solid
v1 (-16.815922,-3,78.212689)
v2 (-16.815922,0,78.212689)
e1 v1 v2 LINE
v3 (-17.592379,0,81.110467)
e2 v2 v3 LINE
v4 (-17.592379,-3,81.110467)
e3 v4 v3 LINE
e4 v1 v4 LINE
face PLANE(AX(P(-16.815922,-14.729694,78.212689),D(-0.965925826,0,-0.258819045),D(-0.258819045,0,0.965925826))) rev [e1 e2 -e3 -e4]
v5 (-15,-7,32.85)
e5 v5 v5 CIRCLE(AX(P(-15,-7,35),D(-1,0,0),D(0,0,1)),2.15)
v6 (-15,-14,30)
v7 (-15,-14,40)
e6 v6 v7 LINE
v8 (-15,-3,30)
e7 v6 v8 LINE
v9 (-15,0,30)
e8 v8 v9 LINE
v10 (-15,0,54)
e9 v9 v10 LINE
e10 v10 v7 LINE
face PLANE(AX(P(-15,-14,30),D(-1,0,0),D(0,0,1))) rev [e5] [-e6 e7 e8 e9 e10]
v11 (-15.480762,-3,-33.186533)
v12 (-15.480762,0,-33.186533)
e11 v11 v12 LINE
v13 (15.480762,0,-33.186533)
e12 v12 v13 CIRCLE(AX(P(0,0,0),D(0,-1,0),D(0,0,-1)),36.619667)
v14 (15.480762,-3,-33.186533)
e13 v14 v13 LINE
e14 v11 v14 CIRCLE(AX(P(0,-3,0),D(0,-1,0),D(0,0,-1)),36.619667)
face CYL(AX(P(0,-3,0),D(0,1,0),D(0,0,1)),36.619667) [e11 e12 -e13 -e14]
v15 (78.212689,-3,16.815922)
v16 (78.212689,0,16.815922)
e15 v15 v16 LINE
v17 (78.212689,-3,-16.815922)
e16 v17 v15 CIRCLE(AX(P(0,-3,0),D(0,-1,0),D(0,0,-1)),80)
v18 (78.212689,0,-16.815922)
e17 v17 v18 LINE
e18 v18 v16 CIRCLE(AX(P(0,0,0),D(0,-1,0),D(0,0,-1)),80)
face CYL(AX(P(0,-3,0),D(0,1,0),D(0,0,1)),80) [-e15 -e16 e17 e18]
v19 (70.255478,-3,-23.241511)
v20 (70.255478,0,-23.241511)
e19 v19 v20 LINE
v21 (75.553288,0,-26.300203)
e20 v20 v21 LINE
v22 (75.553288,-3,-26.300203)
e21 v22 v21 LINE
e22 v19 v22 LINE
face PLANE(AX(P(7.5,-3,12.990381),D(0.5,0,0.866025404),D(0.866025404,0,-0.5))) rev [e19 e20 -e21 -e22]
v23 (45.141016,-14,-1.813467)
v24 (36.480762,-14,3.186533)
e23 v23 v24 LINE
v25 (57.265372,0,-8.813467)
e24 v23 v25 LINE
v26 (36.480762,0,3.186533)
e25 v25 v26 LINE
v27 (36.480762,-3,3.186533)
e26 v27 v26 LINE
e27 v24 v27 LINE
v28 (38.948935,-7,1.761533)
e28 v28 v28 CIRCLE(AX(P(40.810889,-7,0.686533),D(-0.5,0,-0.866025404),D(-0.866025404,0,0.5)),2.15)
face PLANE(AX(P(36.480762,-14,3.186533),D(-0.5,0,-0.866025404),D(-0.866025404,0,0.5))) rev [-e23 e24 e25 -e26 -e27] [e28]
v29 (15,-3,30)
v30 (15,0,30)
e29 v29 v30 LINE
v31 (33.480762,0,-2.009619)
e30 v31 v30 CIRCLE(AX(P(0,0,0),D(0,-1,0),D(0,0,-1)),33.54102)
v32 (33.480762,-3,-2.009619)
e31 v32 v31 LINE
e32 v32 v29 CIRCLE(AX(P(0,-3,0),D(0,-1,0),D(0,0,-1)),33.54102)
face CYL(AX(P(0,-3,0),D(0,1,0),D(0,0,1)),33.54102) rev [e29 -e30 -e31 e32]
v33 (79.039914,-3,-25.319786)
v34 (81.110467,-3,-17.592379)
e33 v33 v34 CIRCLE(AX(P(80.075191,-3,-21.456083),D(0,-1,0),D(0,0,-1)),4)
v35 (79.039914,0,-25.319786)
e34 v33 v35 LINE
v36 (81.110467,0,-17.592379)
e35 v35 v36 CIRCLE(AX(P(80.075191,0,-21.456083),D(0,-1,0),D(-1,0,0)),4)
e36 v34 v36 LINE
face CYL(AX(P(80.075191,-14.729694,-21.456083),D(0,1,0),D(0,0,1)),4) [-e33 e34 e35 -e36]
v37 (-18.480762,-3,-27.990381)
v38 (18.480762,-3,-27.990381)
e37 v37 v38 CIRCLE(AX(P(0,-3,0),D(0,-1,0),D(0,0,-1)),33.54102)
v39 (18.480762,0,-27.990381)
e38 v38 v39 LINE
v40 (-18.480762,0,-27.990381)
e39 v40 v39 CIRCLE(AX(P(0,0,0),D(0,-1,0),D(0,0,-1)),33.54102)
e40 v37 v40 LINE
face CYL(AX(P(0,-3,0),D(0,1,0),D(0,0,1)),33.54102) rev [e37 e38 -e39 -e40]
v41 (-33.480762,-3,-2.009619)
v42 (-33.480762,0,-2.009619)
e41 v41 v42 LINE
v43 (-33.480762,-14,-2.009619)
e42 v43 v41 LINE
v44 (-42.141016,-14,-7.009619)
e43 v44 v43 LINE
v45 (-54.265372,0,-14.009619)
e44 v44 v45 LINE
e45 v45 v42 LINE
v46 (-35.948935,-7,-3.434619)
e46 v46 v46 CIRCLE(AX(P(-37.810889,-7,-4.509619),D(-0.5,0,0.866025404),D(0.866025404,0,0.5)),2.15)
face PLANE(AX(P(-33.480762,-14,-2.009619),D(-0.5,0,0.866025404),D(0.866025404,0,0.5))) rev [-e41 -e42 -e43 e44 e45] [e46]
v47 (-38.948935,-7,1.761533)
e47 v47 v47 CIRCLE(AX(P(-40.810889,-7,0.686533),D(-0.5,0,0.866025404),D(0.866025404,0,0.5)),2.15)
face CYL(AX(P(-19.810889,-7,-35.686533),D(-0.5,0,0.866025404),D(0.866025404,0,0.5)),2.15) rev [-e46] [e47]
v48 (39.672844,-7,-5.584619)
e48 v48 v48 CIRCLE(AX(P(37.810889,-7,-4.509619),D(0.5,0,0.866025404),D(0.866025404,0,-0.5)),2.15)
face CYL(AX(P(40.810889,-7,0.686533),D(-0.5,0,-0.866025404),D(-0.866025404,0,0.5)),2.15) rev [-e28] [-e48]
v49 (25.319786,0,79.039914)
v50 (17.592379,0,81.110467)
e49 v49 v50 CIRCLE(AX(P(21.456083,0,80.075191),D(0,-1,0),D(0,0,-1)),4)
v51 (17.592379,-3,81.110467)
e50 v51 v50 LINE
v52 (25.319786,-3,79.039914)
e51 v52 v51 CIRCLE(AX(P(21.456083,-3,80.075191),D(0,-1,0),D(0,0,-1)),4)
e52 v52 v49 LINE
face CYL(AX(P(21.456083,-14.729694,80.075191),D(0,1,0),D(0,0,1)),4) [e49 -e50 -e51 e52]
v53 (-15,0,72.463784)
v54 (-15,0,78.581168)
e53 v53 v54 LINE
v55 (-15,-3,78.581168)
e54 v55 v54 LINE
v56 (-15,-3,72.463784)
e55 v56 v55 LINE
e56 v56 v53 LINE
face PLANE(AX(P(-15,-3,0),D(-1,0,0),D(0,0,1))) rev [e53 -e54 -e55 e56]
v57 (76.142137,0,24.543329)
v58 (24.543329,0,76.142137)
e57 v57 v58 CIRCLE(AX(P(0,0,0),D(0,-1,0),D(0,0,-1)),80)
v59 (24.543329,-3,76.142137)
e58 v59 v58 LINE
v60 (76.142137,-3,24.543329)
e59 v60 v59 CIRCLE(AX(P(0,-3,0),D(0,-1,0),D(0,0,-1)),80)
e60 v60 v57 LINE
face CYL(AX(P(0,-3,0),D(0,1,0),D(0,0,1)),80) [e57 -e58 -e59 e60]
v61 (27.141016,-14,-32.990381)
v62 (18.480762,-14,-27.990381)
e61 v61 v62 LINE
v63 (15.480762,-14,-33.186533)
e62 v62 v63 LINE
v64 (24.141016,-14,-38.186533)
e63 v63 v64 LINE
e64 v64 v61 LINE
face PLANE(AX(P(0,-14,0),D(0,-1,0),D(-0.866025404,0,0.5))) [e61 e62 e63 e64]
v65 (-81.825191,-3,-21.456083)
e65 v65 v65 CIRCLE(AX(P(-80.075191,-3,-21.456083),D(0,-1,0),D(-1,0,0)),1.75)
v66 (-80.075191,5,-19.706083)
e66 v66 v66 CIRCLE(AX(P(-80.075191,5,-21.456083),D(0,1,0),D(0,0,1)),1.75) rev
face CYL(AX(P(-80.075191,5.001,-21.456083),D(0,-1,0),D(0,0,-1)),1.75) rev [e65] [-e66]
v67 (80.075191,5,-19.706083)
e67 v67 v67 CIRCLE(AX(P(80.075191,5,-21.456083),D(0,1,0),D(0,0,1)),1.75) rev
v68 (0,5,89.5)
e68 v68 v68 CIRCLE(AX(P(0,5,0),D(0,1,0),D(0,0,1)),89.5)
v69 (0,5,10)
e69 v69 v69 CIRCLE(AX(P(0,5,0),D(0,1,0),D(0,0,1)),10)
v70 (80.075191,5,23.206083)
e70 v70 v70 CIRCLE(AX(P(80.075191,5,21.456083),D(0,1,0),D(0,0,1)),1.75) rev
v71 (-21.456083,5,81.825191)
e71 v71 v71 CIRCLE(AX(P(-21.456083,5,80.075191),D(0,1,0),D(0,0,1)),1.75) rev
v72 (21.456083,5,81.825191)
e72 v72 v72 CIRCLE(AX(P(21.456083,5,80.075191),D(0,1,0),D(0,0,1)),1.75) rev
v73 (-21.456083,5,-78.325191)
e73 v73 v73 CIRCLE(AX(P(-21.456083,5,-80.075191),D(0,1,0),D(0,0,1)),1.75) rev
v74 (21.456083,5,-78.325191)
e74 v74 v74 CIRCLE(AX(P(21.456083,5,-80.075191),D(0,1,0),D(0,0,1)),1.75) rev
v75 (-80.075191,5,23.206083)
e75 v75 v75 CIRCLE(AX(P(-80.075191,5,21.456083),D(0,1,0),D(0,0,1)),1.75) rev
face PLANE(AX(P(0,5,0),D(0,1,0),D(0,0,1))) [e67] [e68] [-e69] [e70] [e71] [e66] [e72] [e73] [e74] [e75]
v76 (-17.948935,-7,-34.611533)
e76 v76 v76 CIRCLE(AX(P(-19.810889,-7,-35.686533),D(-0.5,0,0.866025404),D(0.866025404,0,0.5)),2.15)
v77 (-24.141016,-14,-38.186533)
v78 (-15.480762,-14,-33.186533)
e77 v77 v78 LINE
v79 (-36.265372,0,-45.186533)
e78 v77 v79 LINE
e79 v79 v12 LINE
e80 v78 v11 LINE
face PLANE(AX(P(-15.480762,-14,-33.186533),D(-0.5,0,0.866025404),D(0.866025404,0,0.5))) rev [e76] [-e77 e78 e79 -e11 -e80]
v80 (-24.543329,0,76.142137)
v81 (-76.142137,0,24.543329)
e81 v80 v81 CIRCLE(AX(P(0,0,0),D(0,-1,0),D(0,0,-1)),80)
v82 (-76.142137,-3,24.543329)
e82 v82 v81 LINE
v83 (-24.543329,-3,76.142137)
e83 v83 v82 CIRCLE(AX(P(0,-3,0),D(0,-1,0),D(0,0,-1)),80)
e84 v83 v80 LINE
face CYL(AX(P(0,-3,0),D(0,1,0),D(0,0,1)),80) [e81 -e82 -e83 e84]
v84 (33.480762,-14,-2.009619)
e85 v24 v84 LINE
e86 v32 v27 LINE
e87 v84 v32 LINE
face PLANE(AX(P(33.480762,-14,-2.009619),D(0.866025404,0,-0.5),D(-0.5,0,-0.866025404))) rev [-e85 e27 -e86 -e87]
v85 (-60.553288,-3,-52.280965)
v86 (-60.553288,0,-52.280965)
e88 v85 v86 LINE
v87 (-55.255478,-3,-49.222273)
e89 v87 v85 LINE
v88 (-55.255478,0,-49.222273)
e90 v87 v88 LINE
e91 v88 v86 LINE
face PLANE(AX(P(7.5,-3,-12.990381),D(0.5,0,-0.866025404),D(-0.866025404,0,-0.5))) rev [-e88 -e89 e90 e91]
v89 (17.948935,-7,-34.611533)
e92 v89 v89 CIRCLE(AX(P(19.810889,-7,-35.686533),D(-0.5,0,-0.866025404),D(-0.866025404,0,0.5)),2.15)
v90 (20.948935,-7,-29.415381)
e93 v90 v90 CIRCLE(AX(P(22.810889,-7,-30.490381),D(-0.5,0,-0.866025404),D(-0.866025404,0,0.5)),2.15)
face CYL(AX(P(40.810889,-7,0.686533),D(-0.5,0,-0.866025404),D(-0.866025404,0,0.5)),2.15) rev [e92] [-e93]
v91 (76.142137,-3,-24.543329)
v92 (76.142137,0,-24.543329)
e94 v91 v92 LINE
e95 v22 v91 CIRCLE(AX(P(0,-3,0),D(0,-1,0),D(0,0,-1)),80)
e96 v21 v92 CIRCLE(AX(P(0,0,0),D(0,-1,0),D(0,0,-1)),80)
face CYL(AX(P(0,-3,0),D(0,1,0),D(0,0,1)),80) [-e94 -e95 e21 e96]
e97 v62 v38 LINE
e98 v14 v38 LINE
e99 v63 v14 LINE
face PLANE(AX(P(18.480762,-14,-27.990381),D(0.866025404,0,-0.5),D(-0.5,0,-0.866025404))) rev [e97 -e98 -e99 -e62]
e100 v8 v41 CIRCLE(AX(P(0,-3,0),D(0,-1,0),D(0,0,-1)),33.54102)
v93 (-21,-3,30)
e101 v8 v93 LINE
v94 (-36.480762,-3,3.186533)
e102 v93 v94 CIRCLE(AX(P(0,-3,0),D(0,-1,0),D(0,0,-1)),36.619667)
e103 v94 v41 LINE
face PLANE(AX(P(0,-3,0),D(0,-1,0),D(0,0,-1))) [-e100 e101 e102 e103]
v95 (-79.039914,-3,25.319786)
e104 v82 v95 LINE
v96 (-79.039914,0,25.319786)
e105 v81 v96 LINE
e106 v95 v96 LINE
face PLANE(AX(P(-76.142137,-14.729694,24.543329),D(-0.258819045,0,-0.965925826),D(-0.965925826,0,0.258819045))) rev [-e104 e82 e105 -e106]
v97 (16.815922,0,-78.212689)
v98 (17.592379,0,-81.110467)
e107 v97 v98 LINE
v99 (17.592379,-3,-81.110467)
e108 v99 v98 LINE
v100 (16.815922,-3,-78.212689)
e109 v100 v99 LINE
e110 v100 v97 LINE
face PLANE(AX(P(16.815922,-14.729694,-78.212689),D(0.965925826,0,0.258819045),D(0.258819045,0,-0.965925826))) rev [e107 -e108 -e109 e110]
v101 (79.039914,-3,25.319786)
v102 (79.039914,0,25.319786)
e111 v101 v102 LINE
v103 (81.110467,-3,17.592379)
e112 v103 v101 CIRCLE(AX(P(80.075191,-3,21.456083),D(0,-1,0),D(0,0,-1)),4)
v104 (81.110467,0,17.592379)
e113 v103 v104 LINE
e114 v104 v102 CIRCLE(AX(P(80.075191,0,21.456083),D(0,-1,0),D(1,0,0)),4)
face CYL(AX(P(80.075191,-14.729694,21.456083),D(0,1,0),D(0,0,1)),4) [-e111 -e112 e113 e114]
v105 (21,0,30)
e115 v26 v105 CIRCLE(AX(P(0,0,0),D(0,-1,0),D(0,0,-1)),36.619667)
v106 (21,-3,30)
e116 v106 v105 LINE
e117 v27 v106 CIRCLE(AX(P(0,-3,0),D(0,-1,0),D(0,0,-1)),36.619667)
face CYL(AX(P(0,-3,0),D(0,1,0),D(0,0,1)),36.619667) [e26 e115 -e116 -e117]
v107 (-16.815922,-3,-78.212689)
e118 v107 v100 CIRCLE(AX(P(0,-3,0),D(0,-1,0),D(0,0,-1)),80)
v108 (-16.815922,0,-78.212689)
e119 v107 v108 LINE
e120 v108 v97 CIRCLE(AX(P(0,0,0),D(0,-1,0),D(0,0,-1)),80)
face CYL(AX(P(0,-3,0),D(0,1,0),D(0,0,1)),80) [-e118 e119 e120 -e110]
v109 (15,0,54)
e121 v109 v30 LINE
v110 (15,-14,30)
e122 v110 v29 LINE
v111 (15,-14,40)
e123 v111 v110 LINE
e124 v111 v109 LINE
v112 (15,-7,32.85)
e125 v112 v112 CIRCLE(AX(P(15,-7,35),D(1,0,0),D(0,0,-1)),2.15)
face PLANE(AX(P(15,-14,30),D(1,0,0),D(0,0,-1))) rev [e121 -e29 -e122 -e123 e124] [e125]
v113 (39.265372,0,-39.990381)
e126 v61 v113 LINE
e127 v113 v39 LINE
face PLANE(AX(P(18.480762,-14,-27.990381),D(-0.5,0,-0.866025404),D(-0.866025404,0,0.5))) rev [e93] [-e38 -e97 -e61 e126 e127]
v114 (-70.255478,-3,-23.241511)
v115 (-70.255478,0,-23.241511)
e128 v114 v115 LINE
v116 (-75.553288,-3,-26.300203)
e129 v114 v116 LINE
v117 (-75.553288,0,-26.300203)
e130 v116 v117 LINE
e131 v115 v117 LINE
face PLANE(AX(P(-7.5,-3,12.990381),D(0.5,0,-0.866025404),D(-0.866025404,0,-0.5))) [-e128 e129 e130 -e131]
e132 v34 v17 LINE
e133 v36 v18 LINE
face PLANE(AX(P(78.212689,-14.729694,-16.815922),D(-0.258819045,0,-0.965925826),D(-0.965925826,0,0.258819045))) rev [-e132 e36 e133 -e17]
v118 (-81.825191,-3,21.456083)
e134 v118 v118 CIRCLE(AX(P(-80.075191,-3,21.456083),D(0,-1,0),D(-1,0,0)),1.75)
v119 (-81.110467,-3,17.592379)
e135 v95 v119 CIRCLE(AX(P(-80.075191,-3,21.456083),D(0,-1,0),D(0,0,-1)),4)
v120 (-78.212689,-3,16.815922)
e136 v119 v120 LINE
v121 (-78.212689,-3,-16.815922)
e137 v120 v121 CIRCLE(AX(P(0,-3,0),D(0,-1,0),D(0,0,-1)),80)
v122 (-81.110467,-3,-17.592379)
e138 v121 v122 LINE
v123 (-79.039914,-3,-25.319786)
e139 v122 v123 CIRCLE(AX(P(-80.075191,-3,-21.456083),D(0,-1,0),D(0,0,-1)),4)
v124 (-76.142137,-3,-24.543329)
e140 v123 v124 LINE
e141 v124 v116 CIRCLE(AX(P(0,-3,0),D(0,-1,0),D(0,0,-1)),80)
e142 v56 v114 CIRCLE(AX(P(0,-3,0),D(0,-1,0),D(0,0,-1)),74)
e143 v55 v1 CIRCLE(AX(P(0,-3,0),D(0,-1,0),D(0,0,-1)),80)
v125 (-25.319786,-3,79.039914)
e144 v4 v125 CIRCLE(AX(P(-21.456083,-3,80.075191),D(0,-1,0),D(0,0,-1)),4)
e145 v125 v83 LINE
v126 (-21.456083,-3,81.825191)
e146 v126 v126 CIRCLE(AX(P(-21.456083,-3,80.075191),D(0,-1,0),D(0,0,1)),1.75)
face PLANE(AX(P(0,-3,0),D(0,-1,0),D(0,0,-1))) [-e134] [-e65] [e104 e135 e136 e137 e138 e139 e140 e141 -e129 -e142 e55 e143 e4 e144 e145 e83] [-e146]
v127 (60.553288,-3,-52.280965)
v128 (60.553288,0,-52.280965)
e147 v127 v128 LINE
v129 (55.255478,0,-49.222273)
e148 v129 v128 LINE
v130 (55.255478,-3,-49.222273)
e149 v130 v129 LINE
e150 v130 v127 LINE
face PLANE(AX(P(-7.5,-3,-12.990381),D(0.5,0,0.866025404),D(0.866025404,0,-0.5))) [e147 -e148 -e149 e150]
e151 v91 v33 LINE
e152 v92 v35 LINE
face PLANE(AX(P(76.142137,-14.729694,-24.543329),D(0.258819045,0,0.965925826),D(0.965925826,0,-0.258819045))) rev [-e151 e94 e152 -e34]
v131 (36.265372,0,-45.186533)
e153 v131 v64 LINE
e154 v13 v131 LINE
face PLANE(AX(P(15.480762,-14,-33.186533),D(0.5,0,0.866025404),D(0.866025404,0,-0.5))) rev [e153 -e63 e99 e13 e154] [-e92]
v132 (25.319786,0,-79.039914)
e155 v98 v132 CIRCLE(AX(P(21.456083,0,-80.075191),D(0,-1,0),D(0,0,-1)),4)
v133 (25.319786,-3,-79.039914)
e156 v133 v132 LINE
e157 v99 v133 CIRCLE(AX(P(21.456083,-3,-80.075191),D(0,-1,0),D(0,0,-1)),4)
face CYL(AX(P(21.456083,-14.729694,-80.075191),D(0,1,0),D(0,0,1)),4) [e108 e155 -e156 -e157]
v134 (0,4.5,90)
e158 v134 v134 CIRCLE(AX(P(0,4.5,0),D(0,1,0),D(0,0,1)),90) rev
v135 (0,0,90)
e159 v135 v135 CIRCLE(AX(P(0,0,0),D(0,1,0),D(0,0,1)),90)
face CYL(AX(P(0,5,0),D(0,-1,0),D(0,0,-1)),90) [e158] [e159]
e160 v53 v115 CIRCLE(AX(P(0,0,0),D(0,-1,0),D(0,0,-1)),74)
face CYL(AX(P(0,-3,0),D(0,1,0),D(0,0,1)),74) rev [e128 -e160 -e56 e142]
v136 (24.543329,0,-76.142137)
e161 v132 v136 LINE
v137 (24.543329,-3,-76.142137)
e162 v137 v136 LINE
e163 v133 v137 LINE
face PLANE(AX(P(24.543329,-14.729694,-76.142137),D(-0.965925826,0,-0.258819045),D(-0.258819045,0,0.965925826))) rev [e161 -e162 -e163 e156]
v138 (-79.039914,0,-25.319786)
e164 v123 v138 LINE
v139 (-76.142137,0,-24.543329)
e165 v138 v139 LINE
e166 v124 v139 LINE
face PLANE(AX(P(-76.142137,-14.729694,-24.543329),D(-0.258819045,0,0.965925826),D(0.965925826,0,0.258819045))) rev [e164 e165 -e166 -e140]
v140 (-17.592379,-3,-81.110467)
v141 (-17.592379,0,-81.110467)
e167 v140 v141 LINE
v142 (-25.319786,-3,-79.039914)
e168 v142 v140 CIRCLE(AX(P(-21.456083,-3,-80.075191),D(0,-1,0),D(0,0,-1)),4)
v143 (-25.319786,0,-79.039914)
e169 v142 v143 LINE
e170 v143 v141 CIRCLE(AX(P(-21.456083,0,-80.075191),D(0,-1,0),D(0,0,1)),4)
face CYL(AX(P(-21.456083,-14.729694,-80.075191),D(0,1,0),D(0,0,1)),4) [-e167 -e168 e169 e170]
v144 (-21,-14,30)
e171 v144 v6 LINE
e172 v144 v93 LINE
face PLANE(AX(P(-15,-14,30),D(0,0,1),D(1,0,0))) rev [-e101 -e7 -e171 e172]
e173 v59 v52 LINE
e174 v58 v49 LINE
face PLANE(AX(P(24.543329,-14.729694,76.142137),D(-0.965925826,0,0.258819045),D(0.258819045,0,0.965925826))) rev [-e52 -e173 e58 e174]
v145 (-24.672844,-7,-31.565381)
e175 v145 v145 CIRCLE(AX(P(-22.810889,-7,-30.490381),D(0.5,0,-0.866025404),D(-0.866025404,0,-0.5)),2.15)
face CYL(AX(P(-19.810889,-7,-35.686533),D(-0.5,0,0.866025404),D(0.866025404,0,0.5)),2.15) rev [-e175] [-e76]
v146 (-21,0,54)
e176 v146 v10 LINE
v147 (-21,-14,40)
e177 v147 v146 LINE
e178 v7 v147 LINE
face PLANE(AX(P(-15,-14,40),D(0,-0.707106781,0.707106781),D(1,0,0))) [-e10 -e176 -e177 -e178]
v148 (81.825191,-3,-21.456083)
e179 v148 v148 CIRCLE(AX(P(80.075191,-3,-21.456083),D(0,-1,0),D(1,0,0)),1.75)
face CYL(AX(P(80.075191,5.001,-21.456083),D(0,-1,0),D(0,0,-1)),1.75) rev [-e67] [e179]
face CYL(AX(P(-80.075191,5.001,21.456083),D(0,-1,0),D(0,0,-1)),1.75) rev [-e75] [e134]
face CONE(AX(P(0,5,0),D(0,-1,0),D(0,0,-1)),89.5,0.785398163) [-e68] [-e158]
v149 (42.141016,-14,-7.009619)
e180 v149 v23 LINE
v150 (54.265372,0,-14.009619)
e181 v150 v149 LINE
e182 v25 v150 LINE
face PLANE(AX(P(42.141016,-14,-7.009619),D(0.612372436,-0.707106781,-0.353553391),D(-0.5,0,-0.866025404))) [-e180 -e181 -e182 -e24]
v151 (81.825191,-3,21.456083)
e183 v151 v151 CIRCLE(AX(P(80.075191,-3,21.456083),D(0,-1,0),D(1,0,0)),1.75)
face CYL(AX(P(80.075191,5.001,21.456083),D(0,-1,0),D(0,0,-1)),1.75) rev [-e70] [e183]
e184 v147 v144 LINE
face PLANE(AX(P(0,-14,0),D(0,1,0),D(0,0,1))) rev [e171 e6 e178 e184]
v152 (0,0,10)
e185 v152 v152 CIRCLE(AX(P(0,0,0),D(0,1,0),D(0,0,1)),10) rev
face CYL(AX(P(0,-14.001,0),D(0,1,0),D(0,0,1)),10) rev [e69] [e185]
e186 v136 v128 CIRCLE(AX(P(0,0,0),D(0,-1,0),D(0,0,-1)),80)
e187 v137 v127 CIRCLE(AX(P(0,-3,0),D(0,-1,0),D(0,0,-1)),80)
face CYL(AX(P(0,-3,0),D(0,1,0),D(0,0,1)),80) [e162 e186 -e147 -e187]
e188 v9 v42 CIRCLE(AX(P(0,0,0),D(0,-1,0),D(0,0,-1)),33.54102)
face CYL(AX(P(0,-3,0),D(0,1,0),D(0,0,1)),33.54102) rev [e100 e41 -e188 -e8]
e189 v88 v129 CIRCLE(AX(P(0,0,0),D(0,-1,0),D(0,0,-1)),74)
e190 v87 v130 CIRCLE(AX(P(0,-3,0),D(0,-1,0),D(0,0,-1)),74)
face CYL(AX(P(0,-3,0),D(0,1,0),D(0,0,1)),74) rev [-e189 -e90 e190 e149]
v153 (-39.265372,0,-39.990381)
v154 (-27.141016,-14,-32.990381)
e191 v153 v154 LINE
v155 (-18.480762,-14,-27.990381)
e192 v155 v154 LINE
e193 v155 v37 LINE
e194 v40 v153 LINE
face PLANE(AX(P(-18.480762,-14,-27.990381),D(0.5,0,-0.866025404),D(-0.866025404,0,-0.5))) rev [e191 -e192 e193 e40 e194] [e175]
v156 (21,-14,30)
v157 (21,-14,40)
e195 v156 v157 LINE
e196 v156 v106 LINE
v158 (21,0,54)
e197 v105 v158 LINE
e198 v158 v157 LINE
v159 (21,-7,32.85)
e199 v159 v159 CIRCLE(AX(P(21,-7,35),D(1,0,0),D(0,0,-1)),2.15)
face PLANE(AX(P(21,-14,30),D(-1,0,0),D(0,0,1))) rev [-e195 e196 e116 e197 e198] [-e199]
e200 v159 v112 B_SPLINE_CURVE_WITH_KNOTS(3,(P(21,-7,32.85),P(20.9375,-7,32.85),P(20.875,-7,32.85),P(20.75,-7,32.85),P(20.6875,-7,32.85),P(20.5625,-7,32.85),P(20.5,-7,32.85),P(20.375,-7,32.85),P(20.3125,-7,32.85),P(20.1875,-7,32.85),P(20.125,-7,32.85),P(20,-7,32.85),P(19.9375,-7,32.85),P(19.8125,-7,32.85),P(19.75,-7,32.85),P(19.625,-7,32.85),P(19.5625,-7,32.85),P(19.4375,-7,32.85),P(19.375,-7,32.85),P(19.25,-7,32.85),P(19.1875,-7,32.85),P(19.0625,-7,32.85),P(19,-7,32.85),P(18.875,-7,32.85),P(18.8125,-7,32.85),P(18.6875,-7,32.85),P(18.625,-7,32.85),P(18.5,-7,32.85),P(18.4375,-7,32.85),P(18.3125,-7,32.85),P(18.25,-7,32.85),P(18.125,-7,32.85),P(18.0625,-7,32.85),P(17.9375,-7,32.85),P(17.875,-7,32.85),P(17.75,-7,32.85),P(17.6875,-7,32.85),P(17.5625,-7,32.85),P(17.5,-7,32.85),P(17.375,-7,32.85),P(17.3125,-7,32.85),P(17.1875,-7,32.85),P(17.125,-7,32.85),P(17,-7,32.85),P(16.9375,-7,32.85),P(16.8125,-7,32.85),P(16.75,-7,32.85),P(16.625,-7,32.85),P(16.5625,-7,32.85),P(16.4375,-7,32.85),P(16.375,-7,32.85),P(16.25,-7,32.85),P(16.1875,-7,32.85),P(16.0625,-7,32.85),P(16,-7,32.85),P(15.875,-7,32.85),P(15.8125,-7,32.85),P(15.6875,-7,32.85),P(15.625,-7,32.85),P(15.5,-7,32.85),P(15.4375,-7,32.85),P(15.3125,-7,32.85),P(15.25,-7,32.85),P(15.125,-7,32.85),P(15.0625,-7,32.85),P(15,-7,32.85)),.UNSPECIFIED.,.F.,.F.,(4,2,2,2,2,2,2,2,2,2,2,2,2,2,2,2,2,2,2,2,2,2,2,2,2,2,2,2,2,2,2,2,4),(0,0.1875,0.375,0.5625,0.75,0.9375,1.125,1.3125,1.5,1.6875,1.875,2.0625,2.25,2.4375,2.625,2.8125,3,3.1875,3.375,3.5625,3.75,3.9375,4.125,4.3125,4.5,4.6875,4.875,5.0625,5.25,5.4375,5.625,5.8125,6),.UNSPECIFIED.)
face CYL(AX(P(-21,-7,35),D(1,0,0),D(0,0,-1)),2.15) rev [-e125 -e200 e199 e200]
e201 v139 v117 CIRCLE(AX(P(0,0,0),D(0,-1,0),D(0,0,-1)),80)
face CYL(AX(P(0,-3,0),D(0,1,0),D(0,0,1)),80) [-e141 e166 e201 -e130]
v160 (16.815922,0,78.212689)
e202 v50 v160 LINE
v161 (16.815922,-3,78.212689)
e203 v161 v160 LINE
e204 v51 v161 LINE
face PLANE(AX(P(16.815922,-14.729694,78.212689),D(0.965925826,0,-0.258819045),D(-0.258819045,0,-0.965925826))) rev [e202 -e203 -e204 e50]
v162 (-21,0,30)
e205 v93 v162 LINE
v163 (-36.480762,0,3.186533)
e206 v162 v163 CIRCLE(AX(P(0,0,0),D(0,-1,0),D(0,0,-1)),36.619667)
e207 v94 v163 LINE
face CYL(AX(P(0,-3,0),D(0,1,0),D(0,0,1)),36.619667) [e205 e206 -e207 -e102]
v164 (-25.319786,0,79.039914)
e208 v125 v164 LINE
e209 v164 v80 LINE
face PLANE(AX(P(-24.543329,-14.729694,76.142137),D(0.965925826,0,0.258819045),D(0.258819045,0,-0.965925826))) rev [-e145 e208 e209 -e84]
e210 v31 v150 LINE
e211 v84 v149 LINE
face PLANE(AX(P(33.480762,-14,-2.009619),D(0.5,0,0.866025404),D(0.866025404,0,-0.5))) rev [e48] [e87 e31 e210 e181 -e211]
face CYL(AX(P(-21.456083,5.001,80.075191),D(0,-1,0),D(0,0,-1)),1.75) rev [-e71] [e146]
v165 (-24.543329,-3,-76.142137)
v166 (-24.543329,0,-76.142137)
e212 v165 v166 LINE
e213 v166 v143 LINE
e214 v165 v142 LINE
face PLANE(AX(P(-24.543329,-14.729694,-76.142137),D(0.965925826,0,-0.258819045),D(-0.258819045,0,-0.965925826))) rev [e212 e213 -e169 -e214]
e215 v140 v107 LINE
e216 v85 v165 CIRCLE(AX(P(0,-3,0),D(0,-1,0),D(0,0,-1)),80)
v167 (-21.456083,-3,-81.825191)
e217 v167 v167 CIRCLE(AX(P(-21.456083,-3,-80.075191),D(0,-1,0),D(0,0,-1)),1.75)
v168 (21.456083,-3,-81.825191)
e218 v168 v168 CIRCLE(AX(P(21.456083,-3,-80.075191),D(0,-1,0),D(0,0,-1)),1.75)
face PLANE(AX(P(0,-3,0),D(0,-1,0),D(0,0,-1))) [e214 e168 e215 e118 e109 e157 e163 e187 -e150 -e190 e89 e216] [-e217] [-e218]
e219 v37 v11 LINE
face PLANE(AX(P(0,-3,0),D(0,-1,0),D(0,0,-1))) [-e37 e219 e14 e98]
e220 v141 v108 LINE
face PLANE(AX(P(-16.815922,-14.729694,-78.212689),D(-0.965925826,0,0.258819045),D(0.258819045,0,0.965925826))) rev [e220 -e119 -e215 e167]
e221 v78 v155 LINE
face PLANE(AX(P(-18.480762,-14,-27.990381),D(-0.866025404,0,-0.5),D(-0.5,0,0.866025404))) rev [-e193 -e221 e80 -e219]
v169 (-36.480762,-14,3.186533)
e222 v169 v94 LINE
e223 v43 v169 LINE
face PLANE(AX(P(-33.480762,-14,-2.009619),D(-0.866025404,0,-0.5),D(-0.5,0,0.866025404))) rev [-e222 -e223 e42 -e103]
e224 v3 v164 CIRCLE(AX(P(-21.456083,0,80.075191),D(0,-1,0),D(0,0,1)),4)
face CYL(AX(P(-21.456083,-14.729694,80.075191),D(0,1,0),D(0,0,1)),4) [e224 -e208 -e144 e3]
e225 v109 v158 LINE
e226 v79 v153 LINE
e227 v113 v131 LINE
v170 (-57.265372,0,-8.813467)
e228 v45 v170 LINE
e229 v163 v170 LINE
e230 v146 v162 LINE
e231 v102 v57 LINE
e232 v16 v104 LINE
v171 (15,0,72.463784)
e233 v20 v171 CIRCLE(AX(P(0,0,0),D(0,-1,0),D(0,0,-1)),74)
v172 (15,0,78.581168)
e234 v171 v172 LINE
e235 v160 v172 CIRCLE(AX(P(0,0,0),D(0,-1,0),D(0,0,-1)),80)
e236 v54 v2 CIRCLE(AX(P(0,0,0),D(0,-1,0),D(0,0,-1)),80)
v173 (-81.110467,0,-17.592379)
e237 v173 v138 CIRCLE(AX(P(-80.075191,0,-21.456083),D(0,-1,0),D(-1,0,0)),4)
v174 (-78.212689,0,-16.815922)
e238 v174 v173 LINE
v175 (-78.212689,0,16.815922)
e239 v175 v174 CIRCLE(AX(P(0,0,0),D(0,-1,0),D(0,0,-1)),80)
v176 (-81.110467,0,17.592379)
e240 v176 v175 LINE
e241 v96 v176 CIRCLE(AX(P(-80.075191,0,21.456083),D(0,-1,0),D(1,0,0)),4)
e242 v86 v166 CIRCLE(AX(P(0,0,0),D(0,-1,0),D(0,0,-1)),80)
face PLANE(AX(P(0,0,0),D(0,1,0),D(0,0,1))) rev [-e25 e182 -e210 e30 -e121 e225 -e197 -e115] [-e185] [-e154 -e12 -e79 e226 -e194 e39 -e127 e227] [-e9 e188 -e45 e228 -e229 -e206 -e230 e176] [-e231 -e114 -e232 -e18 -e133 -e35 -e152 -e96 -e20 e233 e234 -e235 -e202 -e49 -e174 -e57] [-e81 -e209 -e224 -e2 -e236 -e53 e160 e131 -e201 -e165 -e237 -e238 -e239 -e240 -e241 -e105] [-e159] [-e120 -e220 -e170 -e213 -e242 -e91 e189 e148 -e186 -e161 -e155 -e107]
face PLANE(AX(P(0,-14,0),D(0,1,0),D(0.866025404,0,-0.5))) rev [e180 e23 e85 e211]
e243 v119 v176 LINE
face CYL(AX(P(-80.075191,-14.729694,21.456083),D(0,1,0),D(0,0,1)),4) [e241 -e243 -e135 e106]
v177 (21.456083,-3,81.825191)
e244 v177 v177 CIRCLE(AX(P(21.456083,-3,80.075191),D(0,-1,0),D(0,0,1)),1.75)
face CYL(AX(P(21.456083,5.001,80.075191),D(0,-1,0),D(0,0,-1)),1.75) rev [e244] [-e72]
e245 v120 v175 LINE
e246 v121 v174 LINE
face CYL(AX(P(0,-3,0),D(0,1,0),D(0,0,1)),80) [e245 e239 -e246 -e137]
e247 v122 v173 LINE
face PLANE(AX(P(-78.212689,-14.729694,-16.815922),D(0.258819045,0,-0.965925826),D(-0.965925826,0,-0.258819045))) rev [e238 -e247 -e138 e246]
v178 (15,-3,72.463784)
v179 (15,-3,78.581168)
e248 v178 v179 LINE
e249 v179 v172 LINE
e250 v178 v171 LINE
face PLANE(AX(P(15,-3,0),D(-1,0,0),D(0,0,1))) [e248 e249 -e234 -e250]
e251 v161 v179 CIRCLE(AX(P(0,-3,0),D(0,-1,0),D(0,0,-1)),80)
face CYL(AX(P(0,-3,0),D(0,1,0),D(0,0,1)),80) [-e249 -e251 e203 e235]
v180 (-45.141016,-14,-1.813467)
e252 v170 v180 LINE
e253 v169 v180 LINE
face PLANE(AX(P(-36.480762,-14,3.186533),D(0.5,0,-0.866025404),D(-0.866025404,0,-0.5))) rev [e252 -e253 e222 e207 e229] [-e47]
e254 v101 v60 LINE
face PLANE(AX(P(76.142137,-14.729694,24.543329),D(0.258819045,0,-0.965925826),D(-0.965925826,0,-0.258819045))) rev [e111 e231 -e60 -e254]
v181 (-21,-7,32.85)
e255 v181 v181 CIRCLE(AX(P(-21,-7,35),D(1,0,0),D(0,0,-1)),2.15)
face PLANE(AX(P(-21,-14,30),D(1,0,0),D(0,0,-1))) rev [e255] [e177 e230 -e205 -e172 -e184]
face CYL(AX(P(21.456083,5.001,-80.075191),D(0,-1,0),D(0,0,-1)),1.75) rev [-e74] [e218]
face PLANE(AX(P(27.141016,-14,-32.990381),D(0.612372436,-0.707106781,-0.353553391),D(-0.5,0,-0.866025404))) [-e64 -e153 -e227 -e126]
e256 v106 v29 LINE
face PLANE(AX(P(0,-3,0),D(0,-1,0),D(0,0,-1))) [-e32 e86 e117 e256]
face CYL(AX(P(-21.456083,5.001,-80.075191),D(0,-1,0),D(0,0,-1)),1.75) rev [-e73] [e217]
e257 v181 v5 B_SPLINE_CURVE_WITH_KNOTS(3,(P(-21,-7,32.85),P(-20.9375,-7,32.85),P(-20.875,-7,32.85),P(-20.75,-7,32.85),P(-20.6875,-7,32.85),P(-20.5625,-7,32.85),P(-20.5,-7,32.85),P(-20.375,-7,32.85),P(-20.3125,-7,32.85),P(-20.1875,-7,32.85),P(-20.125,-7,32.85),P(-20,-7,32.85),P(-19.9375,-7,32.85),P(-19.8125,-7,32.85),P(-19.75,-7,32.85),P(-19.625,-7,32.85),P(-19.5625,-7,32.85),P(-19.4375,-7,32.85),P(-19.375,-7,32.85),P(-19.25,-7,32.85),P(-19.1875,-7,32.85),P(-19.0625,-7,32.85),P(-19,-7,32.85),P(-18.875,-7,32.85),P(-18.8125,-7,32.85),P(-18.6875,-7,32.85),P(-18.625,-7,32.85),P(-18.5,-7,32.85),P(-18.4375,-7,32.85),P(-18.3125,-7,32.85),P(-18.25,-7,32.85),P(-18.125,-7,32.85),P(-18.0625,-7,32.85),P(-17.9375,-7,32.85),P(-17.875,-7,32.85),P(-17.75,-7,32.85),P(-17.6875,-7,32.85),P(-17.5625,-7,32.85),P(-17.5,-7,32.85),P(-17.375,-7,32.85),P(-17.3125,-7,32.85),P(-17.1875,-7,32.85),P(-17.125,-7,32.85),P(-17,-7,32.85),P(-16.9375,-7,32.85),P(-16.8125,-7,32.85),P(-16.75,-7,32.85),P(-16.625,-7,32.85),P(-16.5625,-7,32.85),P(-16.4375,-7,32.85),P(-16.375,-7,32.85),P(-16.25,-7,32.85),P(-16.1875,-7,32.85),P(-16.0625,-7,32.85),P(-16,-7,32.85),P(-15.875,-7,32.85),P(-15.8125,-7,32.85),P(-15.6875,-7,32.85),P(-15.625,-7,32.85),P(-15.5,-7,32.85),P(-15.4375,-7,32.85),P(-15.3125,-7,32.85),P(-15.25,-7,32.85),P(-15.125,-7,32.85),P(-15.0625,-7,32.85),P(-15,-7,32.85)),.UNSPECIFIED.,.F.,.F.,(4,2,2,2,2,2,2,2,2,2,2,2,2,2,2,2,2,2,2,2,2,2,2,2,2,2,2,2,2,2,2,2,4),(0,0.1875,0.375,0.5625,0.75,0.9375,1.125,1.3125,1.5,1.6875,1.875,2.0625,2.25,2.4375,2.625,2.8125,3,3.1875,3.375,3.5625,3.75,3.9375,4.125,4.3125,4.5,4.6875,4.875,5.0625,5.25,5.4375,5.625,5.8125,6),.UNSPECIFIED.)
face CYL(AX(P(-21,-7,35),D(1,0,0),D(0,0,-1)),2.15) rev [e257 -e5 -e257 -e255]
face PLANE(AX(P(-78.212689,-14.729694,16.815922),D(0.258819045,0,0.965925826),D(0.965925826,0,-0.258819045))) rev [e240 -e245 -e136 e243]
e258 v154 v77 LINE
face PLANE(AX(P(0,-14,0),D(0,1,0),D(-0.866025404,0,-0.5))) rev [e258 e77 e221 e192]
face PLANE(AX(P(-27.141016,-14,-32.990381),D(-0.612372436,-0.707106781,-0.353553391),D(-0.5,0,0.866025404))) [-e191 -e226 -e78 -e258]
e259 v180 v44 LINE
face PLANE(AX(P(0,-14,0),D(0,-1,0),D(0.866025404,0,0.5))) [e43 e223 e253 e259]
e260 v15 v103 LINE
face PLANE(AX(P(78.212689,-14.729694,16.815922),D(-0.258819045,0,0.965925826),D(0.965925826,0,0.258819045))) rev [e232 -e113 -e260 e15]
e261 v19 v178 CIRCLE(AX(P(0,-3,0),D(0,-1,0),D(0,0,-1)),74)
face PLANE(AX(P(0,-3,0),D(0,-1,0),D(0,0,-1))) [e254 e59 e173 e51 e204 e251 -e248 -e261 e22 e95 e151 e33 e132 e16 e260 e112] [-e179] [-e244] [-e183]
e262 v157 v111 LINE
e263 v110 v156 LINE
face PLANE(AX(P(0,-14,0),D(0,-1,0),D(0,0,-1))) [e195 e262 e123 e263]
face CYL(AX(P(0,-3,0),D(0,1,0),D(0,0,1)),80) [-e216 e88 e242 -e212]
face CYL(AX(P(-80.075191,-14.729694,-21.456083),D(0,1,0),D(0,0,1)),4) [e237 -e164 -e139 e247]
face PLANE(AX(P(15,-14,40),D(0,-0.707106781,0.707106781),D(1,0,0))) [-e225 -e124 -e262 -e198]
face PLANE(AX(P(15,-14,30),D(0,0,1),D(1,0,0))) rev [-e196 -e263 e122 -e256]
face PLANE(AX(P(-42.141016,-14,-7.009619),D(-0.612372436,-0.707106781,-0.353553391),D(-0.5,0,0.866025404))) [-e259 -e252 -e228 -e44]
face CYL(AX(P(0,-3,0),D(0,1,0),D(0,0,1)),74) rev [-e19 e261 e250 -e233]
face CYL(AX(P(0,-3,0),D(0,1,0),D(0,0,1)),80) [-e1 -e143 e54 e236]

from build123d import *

# Parameters (mm, degrees)
SKIZZE1_R                       = 90
AUFSATZ_LINEAR_AUSTRAGEN1_DEPTH = 5
SKIZZE2_W                       = 6
SKIZZE2_H                       = 10
AUFSATZ_LINEAR_AUSTRAGEN2_DEPTH = 14
FASE1_SIZE                      = 14
SKIZZE3_R                       = 2.15
SCHNITT_LINEAR_AUSTRAGEN1_DEPTH = 42
KREISMUSTER1_COUNT              = 3
FASE1_OF_KREISMUSTER1_SIZE      = 14
AUFSATZ_LINEAR_AUSTRAGEN3_DEPTH = 3
AUFSATZ_LINEAR_AUSTRAGEN4_DEPTH = 3
SCHNITT_LINEAR_AUSTRAGEN2_REACH = 129.754
SKIZZE7_R                       = 1.75
KREISMUSTER2_COUNT              = 4
SCHNITT_LINEAR_AUSTRAGEN3_REACH = 130.69
SKIZZE8_R                       = 10
FASE2_SIZE                      = 0.5


with BuildPart() as part:
    # Skizze1 → Aufsatz-Linear austragen1 (new body)
    with BuildSketch(Plane(origin=(0, 0, 0), x_dir=(1, 0, 0), z_dir=(0, 1, 0))):
        with Locations(Location((0, 0, 0), (0, 0, 270))):
            Circle(SKIZZE1_R)
    extrude(amount=AUFSATZ_LINEAR_AUSTRAGEN1_DEPTH)

    # Skizze2 → Aufsatz-Linear austragen2 (add)
    with BuildSketch(Plane.XZ):
        with Locations((-18, 35)):
            Rectangle(SKIZZE2_W, SKIZZE2_H)
        with Locations((18, 35)):
            Rectangle(SKIZZE2_W, SKIZZE2_H)
    aufsatz_linear_austragen2 = extrude(amount=AUFSATZ_LINEAR_AUSTRAGEN2_DEPTH)

    # Fase1
    fase1_edges = [part.edges().sort_by_distance(p)[0] for p in [
        (18, 0, 40),
        (-18, 0, 40),
    ]]
    chamfer(fase1_edges, length=FASE1_SIZE - 0.0001)  # a hair under: the kernel refuses the full size

    # Skizze3 → Schnitt-Linear austragen1 (cut)
    with BuildSketch(Plane(origin=(21, 0, 0), x_dir=(0, 0, -1), z_dir=(1, 0, 0))):
        with Locations((-35, -7)):
            Circle(SKIZZE3_R)
    schnitt_linear_austragen1 = extrude(amount=-SCHNITT_LINEAR_AUSTRAGEN1_DEPTH, mode=Mode.SUBTRACT)

    # Kreismuster1: Aufsatz-Linear austragen2, Schnitt-Linear austragen1 ×3 about axis
    kreismuster1_axis = Axis((0, 0, 0), (0, 1, 0))
    add([aufsatz_linear_austragen2.rotate(kreismuster1_axis, i * 360 / KREISMUSTER1_COUNT) for i in range(1, KREISMUSTER1_COUNT)])
    add([schnitt_linear_austragen1.rotate(kreismuster1_axis, i * 360 / KREISMUSTER1_COUNT) for i in range(1, KREISMUSTER1_COUNT)], mode=Mode.SUBTRACT)

    # Fase1 of Kreismuster1
    fase1_of_kreismuster1_edges = [part.edges().sort_by_distance(p)[0] for p in [
        (25.641016151, 0, -35.588457268),
        (43.641016151, 0, -4.411542732),
        (-43.641016151, 0, -4.411542732),
        (-25.641016151, 0, -35.588457268),
    ]]
    chamfer(fase1_of_kreismuster1_edges, length=FASE1_OF_KREISMUSTER1_SIZE - 0.0001)  # a hair under: the kernel refuses the full size

    # Skizze4 → Aufsatz-Linear austragen3 (add)
    with BuildSketch(Plane.XZ):
        with BuildLine():
            ThreePointArc((-70.255477849, -23.241510972), (-64.08587988, 37), (-15, 72.463784058))
            Line((-15, 72.463784058), (-15, 78.581168228))
            ThreePointArc((-15, 78.581168228), (-69.282032303, 40), (-75.553287944, -26.300203057))
            Line((-75.553287944, -26.300203057), (-70.255477849, -23.241510972))
        make_face()
        with BuildLine():
            Line((15, 78.581168228), (15, 72.463784058))
            ThreePointArc((15, 72.463784058), (57.384666942, 46.722585545), (74, 0))
            ThreePointArc((74, 0), (73.057872132, -11.770612542), (70.255477849, -23.241510972))
            Line((70.255477849, -23.241510972), (75.553287944, -26.300203057))
            ThreePointArc((75.553287944, -26.300203057), (78.880488828, -13.336734317), (80, 0))
            ThreePointArc((80, 0), (61.64414003, 50.990195136), (15, 78.581168228))
        make_face()
        with BuildLine():
            ThreePointArc((55.255477849, -49.222273086), (0, -74), (-55.255477849, -49.222273086))
            Line((-55.255477849, -49.222273086), (-60.553287944, -52.280965171))
            ThreePointArc((-60.553287944, -52.280965171), (0, -80), (60.553287944, -52.280965171))
            Line((60.553287944, -52.280965171), (55.255477849, -49.222273086))
        make_face()
        with BuildLine():
            Line((15.480762114, -33.186533479), (18.480762114, -27.990381057))
            ThreePointArc((18.480762114, -27.990381057), (0, -33.541019662), (-18.480762114, -27.990381057))
            Line((-18.480762114, -27.990381057), (-15.480762114, -33.186533479))
            ThreePointArc((-15.480762114, -33.186533479), (0, -36.619666847), (15.480762114, -33.186533479))
        make_face()
        with BuildLine():
            ThreePointArc((-33.480762114, -2.009618943), (-29.047375097, 16.770509831), (-15, 30))
            Line((-15, 30), (-21, 30))
            ThreePointArc((-21, 30), (-31.713561768, 18.309833424), (-36.480762114, 3.186533479))
            Line((-36.480762114, 3.186533479), (-33.480762114, -2.009618943))
        make_face()
        with BuildLine():
            ThreePointArc((15, 30), (28.531695489, 17.633557569), (33.541019662, 0))
            ThreePointArc((33.541019662, 0), (33.525951891, -1.005261069), (33.480762114, -2.009618943))
            Line((33.480762114, -2.009618943), (36.480762114, 3.186533479))
            ThreePointArc((36.480762114, 3.186533479), (31.713561768, 18.309833424), (21, 30))
            Line((21, 30), (15, 30))
        make_face()
    extrude(amount=AUFSATZ_LINEAR_AUSTRAGEN3_DEPTH)

    # Skizze6 → Aufsatz-Linear austragen4 (add)
    with BuildSketch(Plane.XZ):
        with BuildLine():
            Line((-24.543328812, -76.142136894), (-25.319785948, -79.039914373))
            ThreePointArc((-25.319785948, -79.039914373), (-22.491358823, -83.938893859), (-17.592379337, -81.110466734))
            Line((-17.592379337, -81.110466734), (-16.815922202, -78.212689255))
            Line((-16.815922202, -78.212689255), (-24.543328812, -76.142136894))
        make_face()
        with BuildLine():
            Line((24.543328812, -76.142136894), (16.815922202, -78.212689255))
            Line((16.815922202, -78.212689255), (17.592379337, -81.110466734))
            ThreePointArc((17.592379337, -81.110466734), (22.491358823, -83.938893859), (25.319785948, -79.039914373))
            Line((25.319785948, -79.039914373), (24.543328812, -76.142136894))
        make_face()
    aufsatz_linear_austragen4 = extrude(amount=AUFSATZ_LINEAR_AUSTRAGEN4_DEPTH)

    # Skizze7 → Schnitt-Linear austragen2 (cut, up to next)
    with BuildSketch(Plane.XZ.offset(3), mode=Mode.PRIVATE) as schnitt_linear_austragen2_sk1:
        with Locations(Location((-21.456082643, -80.075190553, 0), (0, 0, 270))):
            Circle(SKIZZE7_R)
    schnitt_linear_austragen2_tool1 = extrude(schnitt_linear_austragen2_sk1.sketch, amount=-SCHNITT_LINEAR_AUSTRAGEN2_REACH, mode=Mode.PRIVATE) & part.part
    # Skizze7 → Schnitt-Linear austragen2 (cut, up to next)
    with BuildSketch(Plane.XZ.offset(3), mode=Mode.PRIVATE) as schnitt_linear_austragen2_sk2:
        with Locations(Location((21.456082643, -80.075190553, 0), (0, 0, 270))):
            Circle(SKIZZE7_R)
    schnitt_linear_austragen2_tool2 = extrude(schnitt_linear_austragen2_sk2.sketch, amount=-SCHNITT_LINEAR_AUSTRAGEN2_REACH, mode=Mode.PRIVATE) & part.part
    schnitt_linear_austragen2_1 = schnitt_linear_austragen2_tool1.solids().sort_by_distance((-21.456083, -3, -80.075191))[0]
    add(schnitt_linear_austragen2_1, mode=Mode.SUBTRACT)
    schnitt_linear_austragen2_2 = schnitt_linear_austragen2_tool2.solids().sort_by_distance((21.456083, -3, -80.075191))[0]
    add(schnitt_linear_austragen2_2, mode=Mode.SUBTRACT)
    schnitt_linear_austragen2 = schnitt_linear_austragen2_1 + schnitt_linear_austragen2_2  # Schnitt-Linear austragen2 as one shape, for the pattern or mirror that repeats it

    # Kreismuster2: Aufsatz-Linear austragen4, Schnitt-Linear austragen2 ×4 about axis
    kreismuster2_axis = Axis((0, 0, 0), (0, 1, 0))
    add([aufsatz_linear_austragen4.rotate(kreismuster2_axis, i * 360 / KREISMUSTER2_COUNT) for i in range(1, KREISMUSTER2_COUNT)])
    add([schnitt_linear_austragen2.rotate(kreismuster2_axis, i * 360 / KREISMUSTER2_COUNT) for i in range(1, KREISMUSTER2_COUNT)], mode=Mode.SUBTRACT)

    # Skizze8 → Schnitt-Linear austragen3 (cut, up to next)
    with BuildSketch(Plane(origin=(0, 5, 0), x_dir=(1, 0, 0), z_dir=(0, 1, 0)), mode=Mode.PRIVATE) as schnitt_linear_austragen3_sk1:
        with Locations(Location((0, 0, 0), (0, 0, 270))):
            Circle(SKIZZE8_R)
    schnitt_linear_austragen3_tool1 = extrude(schnitt_linear_austragen3_sk1.sketch, amount=-SCHNITT_LINEAR_AUSTRAGEN3_REACH, mode=Mode.PRIVATE) & part.part
    add(schnitt_linear_austragen3_tool1.solids().sort_by_distance((0, 5, 0))[0], mode=Mode.SUBTRACT)

    # Fase2
    fase2_edges = [part.edges().sort_by_distance(p)[0] for p in [
        (0, 5, -90),
    ]]
    chamfer(fase2_edges, length=FASE2_SIZE)


solid = part.part
